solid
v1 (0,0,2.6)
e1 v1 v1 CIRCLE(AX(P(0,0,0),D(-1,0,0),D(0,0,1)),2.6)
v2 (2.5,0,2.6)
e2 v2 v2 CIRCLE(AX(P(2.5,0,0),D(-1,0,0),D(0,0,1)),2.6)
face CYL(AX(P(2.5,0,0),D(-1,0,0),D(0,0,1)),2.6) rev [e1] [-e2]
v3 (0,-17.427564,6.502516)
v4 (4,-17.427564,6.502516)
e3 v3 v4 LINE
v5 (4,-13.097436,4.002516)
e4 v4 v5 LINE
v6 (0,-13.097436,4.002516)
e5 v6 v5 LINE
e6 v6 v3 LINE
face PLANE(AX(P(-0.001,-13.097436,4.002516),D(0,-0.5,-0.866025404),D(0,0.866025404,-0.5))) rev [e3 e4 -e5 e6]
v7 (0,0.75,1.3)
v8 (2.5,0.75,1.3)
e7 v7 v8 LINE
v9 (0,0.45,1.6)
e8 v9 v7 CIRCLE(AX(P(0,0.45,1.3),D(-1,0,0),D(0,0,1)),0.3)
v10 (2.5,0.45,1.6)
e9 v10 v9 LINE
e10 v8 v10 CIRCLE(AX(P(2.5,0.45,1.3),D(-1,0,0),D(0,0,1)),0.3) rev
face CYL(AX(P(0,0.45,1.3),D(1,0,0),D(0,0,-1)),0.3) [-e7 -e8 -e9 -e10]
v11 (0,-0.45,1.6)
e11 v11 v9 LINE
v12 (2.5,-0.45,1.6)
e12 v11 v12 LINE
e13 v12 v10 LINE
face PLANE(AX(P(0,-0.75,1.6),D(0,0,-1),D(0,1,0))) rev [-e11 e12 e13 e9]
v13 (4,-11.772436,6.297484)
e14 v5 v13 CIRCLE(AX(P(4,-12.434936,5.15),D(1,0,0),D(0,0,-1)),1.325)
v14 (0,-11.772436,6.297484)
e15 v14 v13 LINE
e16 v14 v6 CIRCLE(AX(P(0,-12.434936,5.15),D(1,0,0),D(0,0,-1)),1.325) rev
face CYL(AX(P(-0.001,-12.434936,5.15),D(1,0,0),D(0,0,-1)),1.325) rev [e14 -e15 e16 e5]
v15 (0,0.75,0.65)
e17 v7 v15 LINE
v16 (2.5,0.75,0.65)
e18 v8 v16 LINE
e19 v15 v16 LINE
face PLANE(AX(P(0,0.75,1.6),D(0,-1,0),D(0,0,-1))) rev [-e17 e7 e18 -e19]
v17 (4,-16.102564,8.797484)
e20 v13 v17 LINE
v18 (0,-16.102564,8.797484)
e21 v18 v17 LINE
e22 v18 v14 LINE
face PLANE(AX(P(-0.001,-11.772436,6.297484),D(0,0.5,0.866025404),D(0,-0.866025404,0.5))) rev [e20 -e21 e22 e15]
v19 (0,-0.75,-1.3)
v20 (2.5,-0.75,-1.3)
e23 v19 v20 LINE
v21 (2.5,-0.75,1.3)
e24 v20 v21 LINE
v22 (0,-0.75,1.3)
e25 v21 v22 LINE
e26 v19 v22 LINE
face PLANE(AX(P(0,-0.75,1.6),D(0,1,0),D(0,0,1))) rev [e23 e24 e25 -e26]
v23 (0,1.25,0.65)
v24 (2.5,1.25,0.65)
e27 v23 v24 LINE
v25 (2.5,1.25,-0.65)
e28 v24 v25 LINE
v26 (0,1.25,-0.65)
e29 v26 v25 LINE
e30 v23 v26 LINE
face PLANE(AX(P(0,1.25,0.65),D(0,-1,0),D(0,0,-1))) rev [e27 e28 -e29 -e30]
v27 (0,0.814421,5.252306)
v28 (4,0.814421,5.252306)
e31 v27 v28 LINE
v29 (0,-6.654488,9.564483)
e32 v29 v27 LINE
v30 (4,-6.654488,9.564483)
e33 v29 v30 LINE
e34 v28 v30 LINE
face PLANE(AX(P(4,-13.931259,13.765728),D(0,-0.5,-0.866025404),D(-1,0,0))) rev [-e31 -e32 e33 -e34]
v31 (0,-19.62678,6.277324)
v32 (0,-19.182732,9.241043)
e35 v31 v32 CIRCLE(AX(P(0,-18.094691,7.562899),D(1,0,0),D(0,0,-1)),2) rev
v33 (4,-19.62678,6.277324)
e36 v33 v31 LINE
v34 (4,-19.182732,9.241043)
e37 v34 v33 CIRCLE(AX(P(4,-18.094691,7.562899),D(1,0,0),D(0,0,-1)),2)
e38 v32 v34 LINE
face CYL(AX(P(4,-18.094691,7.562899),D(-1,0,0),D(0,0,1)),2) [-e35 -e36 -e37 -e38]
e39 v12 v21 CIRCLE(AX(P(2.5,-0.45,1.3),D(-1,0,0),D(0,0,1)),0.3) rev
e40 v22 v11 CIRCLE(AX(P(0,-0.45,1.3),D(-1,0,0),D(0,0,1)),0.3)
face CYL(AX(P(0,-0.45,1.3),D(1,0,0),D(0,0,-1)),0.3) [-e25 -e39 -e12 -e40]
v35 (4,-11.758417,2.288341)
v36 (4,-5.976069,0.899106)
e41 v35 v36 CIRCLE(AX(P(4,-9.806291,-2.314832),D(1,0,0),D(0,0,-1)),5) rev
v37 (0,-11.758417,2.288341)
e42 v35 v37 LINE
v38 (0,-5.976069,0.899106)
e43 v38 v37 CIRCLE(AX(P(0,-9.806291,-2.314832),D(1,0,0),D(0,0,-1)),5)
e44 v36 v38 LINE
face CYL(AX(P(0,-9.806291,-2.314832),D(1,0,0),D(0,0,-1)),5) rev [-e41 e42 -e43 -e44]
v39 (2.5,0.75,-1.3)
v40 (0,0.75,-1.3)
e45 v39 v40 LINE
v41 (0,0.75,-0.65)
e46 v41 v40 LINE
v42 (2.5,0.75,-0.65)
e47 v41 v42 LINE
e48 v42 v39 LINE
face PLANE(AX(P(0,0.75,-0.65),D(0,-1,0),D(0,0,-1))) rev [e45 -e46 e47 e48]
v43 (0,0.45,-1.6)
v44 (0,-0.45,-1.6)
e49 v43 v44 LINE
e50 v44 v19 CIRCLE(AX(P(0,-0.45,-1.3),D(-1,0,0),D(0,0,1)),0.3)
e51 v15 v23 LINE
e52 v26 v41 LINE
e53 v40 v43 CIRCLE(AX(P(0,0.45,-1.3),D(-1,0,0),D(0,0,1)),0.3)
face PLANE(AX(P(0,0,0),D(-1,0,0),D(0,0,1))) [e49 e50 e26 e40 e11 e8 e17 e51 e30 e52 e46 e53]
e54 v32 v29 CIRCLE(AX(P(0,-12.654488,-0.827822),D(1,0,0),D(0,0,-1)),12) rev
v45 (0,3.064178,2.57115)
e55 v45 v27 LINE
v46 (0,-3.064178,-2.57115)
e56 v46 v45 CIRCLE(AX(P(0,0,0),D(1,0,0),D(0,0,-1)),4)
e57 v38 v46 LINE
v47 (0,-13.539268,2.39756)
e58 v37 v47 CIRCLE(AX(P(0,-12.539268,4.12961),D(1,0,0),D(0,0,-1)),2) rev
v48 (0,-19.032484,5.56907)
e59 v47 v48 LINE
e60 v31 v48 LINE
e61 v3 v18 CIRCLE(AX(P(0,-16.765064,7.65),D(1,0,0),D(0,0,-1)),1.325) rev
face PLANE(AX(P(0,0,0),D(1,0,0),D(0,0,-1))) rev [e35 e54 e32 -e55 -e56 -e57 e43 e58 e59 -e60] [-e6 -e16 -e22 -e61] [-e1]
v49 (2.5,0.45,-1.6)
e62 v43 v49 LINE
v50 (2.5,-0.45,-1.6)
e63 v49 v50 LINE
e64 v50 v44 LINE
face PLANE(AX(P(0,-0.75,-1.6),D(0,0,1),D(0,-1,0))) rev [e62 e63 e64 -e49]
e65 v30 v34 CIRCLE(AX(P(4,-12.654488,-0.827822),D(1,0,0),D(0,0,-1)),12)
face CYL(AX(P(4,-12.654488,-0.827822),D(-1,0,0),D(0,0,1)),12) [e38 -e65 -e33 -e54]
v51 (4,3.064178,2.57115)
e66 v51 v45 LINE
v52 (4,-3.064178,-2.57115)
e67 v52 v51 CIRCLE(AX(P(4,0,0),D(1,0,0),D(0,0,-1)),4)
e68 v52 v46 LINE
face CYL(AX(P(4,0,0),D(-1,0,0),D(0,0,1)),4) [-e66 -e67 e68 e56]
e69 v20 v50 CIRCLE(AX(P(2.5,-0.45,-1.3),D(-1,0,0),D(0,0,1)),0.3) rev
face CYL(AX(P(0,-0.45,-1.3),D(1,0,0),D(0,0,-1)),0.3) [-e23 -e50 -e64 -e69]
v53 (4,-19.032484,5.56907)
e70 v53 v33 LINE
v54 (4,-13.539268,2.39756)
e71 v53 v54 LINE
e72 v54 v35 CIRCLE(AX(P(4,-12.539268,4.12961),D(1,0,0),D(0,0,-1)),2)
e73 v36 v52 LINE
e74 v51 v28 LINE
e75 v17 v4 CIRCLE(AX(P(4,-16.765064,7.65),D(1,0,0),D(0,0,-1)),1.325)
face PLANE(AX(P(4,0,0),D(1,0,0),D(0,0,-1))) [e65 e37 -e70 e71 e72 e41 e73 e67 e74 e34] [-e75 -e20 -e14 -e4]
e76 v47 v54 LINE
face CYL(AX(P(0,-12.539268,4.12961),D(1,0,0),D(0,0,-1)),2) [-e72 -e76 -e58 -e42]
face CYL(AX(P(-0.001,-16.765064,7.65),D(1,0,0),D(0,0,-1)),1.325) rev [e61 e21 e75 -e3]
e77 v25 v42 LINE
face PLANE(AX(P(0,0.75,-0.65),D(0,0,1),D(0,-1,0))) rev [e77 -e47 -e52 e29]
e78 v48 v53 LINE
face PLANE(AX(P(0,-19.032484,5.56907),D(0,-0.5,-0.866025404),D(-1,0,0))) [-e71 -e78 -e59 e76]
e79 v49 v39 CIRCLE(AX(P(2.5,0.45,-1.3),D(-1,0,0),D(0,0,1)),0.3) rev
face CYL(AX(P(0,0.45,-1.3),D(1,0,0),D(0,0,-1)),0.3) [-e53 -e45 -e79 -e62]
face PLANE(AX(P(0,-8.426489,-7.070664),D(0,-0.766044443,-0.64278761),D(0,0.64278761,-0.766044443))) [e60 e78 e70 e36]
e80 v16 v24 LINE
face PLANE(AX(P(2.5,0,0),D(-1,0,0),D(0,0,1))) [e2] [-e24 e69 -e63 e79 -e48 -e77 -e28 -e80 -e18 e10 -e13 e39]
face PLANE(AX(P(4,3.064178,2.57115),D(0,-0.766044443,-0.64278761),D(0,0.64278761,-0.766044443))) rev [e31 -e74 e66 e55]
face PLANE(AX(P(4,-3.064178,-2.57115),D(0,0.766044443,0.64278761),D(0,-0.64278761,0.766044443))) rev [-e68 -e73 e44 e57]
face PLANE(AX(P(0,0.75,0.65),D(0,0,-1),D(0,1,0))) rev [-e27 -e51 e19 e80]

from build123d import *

# Parameters (mm, degrees)
SKETCH5_R           = 4
BOSS_EXTRUDE2_DEPTH = 4
BOSS_EXTRUDE3_DEPTH = 4
SKETCH7_R           = 2.6
CUT_EXTRUDE3_DEPTH  = 2.5
BOSS_EXTRUDE4_DEPTH = 2.5
FILLET1_R           = 0.3
SKETCH9_W           = 4
SKETCH9_H           = 10
BOSS_EXTRUDE5_DEPTH = 7
CUT_EXTRUDE4_REACH  = 29.603
CHAMFER1_SIZE       = 16
CHAMFER1_SIZE2      = 5.823523748
CHAMFER2_SIZE       = 7
CHAMFER2_SIZE2      = 2.54779164
FILLET5_R           = 5
FILLET6_R           = 12
FILLET7_R           = 2


with BuildPart() as part:
    # Sketch5 → Boss-Extrude2 (new body)
    with BuildSketch(Plane(origin=(0, 0, 0), x_dir=(0, 0, -1), z_dir=(1, 0, 0))):
        Circle(SKETCH5_R)
    extrude(amount=BOSS_EXTRUDE2_DEPTH)

    # Sketch6 → Boss-Extrude3 (add)
    with BuildSketch(Plane(origin=(0, 0, 0), x_dir=(0, 0, -1), z_dir=(1, 0, 0))):
        Polygon((-2.571150439, 3.064177772), (2.571150439, -3.064177772), (-12.366716202, -15.598536161), (-17.50901708, -9.470180616), align=None)
    extrude(amount=BOSS_EXTRUDE3_DEPTH)

    # Sketch7 → Cut-Extrude3 (cut)
    with BuildSketch(Plane.ZY):
        Circle(SKETCH7_R)
    extrude(amount=-CUT_EXTRUDE3_DEPTH, mode=Mode.SUBTRACT)

    # Sketch8 → Boss-Extrude4 (add)
    with BuildSketch(Plane.ZY.offset(-2.5)):
        Polygon((1.6, -0.75), (-1.6, -0.75), (-1.6, 0.75), (-0.65, 0.75), (-0.65, 1.25), (0.65, 1.25), (0.65, 0.75), (1.6, 0.75), align=None)
    extrude(amount=BOSS_EXTRUDE4_DEPTH)

    # Fillet1
    fillet1_edges = [part.edges().sort_by_distance(p)[0] for p in [
        (1.25, -0.75, 1.6),
        (1.25, 0.75, 1.6),
        (1.25, 0.75, -1.6),
        (1.25, -0.75, -1.6),
    ]]
    fillet(fillet1_edges, radius=FILLET1_R)

    # Sketch9 → Boss-Extrude5 (add)
    with BuildSketch(Plane(origin=(0, -3.064177772, -2.571150439), x_dir=(1, 0, 0), z_dir=(0, -0.766044443118976, -0.6427876096865419))):
        with Locations((2, 14.5)):
            Rectangle(SKETCH9_W, SKETCH9_H)
    extrude(amount=BOSS_EXTRUDE5_DEPTH)

    # Sketch10 → Cut-Extrude4 (cut, up to next)
    with BuildSketch(Plane(origin=(4, 0, 0), x_dir=(0, 0, -1), z_dir=(1, 0, 0)), mode=Mode.PRIVATE) as cut_extrude4_sk1:
        with BuildLine():
            Line((-4.00251634, -13.097436491), (-6.50251634, -17.427563509))
            ThreePointArc((-6.50251634, -17.427563509), (-8.3125, -17.912547169), (-8.79748366, -16.102563509))
            Line((-8.79748366, -16.102563509), (-6.29748366, -11.772436491))
            ThreePointArc((-6.29748366, -11.772436491), (-4.4875, -11.287452831), (-4.00251634, -13.097436491))
        make_face()
    cut_extrude4_tool1 = extrude(cut_extrude4_sk1.sketch, amount=-CUT_EXTRUDE4_REACH, mode=Mode.PRIVATE) & part.part
    add(cut_extrude4_tool1.solids().sort_by_distance((4, -14.6, 6.4))[0], mode=Mode.SUBTRACT)

    # Chamfer1
    chamfer1_edges = [part.edges().sort_by_distance(p)[0] for p in [
        (2, -9.470180616, 17.50901708),
    ]]
    chamfer1_side = [part.faces().sort_by_distance(p)[0] for p in [
        (2, -3.203001422, 10.040083759),
    ]]
    chamfer(chamfer1_edges, length=CHAMFER1_SIZE, length2=CHAMFER1_SIZE2, reference=chamfer1_side[0])

    # Chamfer2
    chamfer2_edges = [part.edges().sort_by_distance(p)[0] for p in [
        (2, -14.532971166, 0.206758503),
    ]]
    chamfer2_side = [part.faces().sort_by_distance(p)[0] for p in [
        (2, -17.746909215, 4.036980719),
    ]]
    chamfer(chamfer2_edges, length=CHAMFER2_SIZE, length2=CHAMFER2_SIZE2, reference=chamfer2_side[0])

    # Fillet5
    # the kernel refuses this fillet: 5 mm, written as the material it adds along each edge
    with BuildSketch(Plane(origin=(4, -9.170660064, 4.706271771), x_dir=(0, -0.7660444431189757, -0.6427876096865421), z_dir=(-1, 0, 0))) as fillet5_piece_1:
        with BuildLine():
            CenterArc((5, -4.969901842), FILLET5_R, 96.289855747, 83.710144253)
            Line((0, -4.969901842), (-0.1, -4.969901842))
            Line((-0.1, -4.969901842), (-0.1, 0))
            Line((-0.1, 0), (0, 0.1))
            ThreePointArc((0, 0.1), (2.22610418, 0.1), (4.441252527, 0.099398037))
            Line((4.441252527, 0.099398037), (4.45220836, 0))
        make_face()
    extrude(amount=4)

    # Fillet6
    fillet6_edges = [part.edges().sort_by_distance(p)[0] for p in [
        (2, -13.931258623, 13.765728169),
    ]]
    fillet(fillet6_edges, radius=FILLET6_R)

    # Fillet7
    fillet7_edges = [part.edges().sort_by_distance(p)[0] for p in [
        (2, -12.581249538, 1.844447401),
        (2, -20.960847263, 7.867202934),
    ]]
    fillet(fillet7_edges, radius=FILLET7_R)


solid = part.part
